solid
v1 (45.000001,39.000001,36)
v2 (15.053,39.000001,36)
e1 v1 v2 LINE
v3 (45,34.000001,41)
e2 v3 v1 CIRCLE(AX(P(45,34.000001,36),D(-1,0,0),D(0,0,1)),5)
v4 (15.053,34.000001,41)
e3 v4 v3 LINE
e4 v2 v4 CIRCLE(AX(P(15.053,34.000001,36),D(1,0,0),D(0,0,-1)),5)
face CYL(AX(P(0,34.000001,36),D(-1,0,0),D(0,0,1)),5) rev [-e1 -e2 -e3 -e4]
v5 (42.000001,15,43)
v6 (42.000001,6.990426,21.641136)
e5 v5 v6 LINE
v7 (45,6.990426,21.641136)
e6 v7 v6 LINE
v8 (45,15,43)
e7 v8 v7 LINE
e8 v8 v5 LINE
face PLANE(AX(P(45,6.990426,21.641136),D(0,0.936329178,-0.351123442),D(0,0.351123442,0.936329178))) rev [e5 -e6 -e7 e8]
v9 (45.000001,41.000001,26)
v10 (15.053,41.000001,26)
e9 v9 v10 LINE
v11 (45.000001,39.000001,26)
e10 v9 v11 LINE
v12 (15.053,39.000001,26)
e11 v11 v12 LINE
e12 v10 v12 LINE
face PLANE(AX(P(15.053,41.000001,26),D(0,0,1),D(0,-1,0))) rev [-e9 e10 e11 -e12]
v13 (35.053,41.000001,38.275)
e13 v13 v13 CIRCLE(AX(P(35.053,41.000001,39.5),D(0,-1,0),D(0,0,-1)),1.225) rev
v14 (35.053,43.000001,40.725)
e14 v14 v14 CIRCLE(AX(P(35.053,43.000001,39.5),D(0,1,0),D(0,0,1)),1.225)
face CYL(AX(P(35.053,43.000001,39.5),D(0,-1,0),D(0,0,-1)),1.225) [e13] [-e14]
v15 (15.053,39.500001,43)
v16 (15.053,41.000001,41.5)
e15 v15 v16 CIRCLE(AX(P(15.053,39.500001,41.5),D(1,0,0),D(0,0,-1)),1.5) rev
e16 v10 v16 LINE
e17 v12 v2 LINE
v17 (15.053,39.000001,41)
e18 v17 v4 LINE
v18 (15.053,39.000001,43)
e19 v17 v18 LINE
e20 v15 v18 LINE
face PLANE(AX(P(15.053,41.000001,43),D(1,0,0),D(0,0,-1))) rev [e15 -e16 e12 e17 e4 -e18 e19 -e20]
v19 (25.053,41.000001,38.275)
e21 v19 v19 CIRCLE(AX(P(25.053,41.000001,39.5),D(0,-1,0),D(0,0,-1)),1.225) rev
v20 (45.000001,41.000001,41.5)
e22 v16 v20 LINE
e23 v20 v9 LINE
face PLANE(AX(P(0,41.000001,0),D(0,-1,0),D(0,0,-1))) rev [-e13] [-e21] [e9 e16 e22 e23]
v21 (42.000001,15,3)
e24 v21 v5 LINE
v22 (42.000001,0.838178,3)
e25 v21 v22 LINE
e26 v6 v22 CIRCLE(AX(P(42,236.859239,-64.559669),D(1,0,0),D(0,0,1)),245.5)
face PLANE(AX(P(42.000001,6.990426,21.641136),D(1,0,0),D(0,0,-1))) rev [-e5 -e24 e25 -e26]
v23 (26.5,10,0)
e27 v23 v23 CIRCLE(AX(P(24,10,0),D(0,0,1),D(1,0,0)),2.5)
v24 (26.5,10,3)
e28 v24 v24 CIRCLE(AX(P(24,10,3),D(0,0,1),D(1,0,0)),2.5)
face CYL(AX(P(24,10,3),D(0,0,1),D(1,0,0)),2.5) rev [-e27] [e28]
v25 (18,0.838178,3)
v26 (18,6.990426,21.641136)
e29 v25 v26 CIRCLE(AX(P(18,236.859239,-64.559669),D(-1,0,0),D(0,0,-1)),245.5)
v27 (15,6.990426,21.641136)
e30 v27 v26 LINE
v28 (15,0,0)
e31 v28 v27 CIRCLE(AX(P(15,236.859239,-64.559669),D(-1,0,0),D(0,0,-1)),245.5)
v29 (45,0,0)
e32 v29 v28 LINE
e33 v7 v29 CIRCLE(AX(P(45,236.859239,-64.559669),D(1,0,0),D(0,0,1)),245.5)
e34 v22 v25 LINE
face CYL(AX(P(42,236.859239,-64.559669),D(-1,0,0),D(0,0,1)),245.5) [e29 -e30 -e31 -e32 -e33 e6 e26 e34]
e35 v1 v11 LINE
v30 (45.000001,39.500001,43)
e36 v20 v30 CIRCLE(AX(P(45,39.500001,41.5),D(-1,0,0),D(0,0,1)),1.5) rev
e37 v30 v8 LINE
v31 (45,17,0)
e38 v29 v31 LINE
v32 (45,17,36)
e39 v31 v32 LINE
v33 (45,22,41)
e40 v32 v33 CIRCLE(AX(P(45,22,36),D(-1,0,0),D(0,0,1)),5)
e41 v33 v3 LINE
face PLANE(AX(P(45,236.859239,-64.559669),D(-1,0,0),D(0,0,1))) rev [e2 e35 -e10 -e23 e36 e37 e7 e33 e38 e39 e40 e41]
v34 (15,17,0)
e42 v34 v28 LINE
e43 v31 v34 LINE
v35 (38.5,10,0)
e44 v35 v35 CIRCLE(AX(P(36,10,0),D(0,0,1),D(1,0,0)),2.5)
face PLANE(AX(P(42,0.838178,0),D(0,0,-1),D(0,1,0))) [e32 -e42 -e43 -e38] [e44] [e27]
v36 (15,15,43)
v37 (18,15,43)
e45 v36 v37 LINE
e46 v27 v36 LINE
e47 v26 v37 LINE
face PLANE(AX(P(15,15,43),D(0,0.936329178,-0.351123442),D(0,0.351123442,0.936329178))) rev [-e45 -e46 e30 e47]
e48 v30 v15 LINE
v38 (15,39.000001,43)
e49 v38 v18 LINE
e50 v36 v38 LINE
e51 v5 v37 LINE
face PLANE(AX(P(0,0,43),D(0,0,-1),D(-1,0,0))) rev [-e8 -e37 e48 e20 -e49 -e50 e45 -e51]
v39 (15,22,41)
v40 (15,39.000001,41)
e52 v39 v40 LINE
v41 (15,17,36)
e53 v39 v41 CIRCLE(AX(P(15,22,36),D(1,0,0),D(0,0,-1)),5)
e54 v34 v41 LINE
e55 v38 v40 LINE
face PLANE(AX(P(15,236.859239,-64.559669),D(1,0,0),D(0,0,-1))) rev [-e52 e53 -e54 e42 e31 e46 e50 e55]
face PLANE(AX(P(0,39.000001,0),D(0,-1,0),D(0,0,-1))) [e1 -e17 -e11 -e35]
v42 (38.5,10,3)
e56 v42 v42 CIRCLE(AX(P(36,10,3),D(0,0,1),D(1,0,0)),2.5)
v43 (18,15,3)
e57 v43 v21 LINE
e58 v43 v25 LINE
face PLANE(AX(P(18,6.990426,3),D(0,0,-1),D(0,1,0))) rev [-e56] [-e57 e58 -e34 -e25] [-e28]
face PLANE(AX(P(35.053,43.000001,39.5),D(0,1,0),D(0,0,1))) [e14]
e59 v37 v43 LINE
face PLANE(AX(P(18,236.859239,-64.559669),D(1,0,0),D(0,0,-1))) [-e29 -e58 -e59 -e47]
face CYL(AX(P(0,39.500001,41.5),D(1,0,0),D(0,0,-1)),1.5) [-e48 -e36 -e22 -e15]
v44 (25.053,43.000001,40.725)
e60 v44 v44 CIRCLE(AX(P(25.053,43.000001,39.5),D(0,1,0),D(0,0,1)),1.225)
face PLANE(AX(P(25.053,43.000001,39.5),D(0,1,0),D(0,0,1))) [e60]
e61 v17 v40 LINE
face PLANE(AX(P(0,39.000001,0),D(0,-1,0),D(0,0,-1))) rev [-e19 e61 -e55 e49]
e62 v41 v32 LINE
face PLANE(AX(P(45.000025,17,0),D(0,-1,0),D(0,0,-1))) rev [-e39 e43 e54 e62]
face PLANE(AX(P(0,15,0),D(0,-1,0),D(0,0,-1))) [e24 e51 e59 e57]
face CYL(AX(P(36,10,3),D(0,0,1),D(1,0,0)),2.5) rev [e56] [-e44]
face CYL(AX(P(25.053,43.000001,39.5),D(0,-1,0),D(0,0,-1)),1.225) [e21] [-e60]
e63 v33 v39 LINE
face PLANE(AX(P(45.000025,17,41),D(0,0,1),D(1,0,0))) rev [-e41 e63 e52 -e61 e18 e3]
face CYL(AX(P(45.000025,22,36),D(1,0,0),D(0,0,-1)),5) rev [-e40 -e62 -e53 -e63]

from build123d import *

# Parameters (mm, degrees)
BOSS_EXTRUDE1_DEPTH      = 24.000000335
SKETCH2_W                = 24.000000671
SKETCH2_H                = 21.641136132
BOSS_EXTRUDE2_DEPTH      = 14.161821686
BOSS_EXTRUDE3_DEPTH      = 2.999999665
BOSS_EXTRUDE4_DEPTH      = 21.358863868
SKETCH5_W                = 27.000000671
SKETCH5_H                = 43
BOSS_EXTRUDE5_DEPTH      = 24.000001
CUT_EXTRUDE1_DEPTH       = 6.152247735
SKETCH7_W                = 24.000000671
SKETCH7_H                = 40
CUT_EXTRUDE2_DEPTH       = 8.00957395
BOSS_EXTRUDE6_START      = 3
BOSS_EXTRUDE6_DEPTH      = 3
SKETCH9_W                = 41
SKETCH9_H                = 22.000001
CUT_EXTRUDE3_DEPTH       = 66.345237915
SKETCH10_W               = 29.947000182
SKETCH10_H               = 17
BOSS_EXTRUDE7_DEPTH      = 2
F_5_0_5_DIAMETER_HOLE1_D = 5
FILLET1_R                = 1.5
FILLET2_R                = 5
SKETCH15_R               = 1.225
BOSS_EXTRUDE8_DEPTH      = 2


with BuildPart() as part:
    # Sketch1 → Boss-Extrude1 (new body)
    with BuildSketch(Plane(origin=(18, 0, 0), x_dir=(0, -1, 0), z_dir=(-1, 0, 0))):
        with BuildLine():
            Line((-0.838178314, 3), (-0.838178314, 0))
            Line((-0.838178314, 0), (0, 0))
            ThreePointArc((0, 0), (-0.41433113, 1.501329358), (-0.838178314, 3))
        make_face()
    extrude(amount=-BOSS_EXTRUDE1_DEPTH)

    # Sketch2 → Boss-Extrude2 (add)
    with BuildSketch(Plane(origin=(0, 0.838178314, 0), x_dir=(-1, 0, 0), z_dir=(0, 1, 0))):
        with Locations((-30.000000336, 10.820568066)):
            Rectangle(SKETCH2_W, SKETCH2_H)
    extrude(amount=BOSS_EXTRUDE2_DEPTH)


with BuildPart() as boss_extrude3_tool:
    # Sketch3 → Boss-Extrude3 (new body)
    with BuildSketch(Plane(origin=(42.000000335, 0, 0), x_dir=(0, 0, -1), z_dir=(1, 0, 0))):
        with BuildLine():
            Line((0, 15), (0, 0))
            ThreePointArc((0, 0), (-10.901557165, 3.244484944), (-21.641136132, 6.99042605))
            Line((-21.641136132, 6.99042605), (-43, 15))
            Line((-43, 15), (0, 15))
        make_face()
    extrude(amount=BOSS_EXTRUDE3_DEPTH)


with BuildPart() as part_1:
    add(part.part)


with BuildPart() as part_2:
    # Boss-Extrude3: joined with boss_extrude3_tool
    add(part_1.part.fuse(boss_extrude3_tool.part, tol=0.00001))

    # Sketch4 → Boss-Extrude4 (add)
    with BuildSketch(Plane.XY.offset(21.641136132)):
        Polygon((42.000000671, 15), (42.000000671, 6.99042605), (42.000000671, 0.838178314), (18, 0.838178314), (18, 6.99042605), (18, 15), align=None)
    extrude(amount=BOSS_EXTRUDE4_DEPTH)

    # Sketch5 → Boss-Extrude5 (add)
    with BuildSketch(Plane(origin=(0, 15, 0), x_dir=(-1, 0, 0), z_dir=(0, 1, 0))):
        with Locations((-31.500000336, 21.5)):
            Rectangle(SKETCH5_W, SKETCH5_H)
    extrude(amount=BOSS_EXTRUDE5_DEPTH)

    # Sketch6 → Cut-Extrude1 (cut)
    with BuildSketch(Plane.XZ.offset(-0.838178314)):
        Polygon((18, 3), (42.000000671, 3), (42.000000671, 21.641136132), (42.000000671, 43), (18, 43), align=None)
    extrude(amount=-CUT_EXTRUDE1_DEPTH, mode=Mode.SUBTRACT)

    # Sketch7 → Cut-Extrude2 (cut)
    with BuildSketch(Plane.XZ.offset(-6.99042605)):
        with Locations((30.000000336, 23)):
            Rectangle(SKETCH7_W, SKETCH7_H)
    extrude(amount=-CUT_EXTRUDE2_DEPTH, mode=Mode.SUBTRACT)

    # Sketch8 → Boss-Extrude6 (add)
    with BuildSketch(Plane.ZY.offset(-18).offset(BOSS_EXTRUDE6_START)):
        with BuildLine():
            Line((0, 39.000001), (43, 39.000001))
            Line((43, 39.000001), (43, 15))
            Line((43, 15), (21.641136132, 6.99042605))
            ThreePointArc((21.641136132, 6.99042605), (10.901557165, 3.244484944), (0, 0))
            Line((0, 0), (0, 39.000001))
        make_face()
    extrude(amount=-BOSS_EXTRUDE6_DEPTH)

    # Sketch9 → Cut-Extrude3 (cut, through all)
    with BuildSketch(Plane.ZY.offset(-15)):
        with Locations((20.5, 28.0000005)):
            Rectangle(SKETCH9_W, SKETCH9_H)
    extrude(amount=-CUT_EXTRUDE3_DEPTH, mode=Mode.SUBTRACT)

    # Sketch10 → Boss-Extrude7 (add)
    with BuildSketch(Plane(origin=(0, 39.000001, 0), x_dir=(-1, 0, 0), z_dir=(0, 1, 0))):
        with Locations((-30.02650058, 34.5)):
            Rectangle(SKETCH10_W, SKETCH10_H)
    extrude(amount=BOSS_EXTRUDE7_DEPTH)

    # Ø5.0 (5) Diameter Hole1 (through all)
    with Locations(Plane.XY.offset(3)):
        with Locations((36.000000045, 10), (23.999999955, 10)):
            Hole(F_5_0_5_DIAMETER_HOLE1_D / 2)

    # Fillet1
    fillet1_edges = [part_2.edges().sort_by_distance(p)[0] for p in [
        (30.02650058, 41.000001, 43),
    ]]
    fillet(fillet1_edges, radius=FILLET1_R)

    # Fillet2
    fillet2_edges = [part_2.edges().sort_by_distance(p)[0] for p in [
        (30.000000335, 17, 41),
        (30.02650058, 39.000001, 41),
    ]]
    fillet(fillet2_edges, radius=FILLET2_R)

    # Sketch15 → Boss-Extrude8 (add)
    with BuildSketch(Plane(origin=(0, 41.000001, 0), x_dir=(1, 0, 0), z_dir=(0, 1, 0))):
        with Locations((25.053000489, -39.5)):
            Circle(SKETCH15_R)
        with Locations((35.053000489, -39.5)):
            Circle(SKETCH15_R)
    extrude(amount=BOSS_EXTRUDE8_DEPTH)


solid = part_2.part
